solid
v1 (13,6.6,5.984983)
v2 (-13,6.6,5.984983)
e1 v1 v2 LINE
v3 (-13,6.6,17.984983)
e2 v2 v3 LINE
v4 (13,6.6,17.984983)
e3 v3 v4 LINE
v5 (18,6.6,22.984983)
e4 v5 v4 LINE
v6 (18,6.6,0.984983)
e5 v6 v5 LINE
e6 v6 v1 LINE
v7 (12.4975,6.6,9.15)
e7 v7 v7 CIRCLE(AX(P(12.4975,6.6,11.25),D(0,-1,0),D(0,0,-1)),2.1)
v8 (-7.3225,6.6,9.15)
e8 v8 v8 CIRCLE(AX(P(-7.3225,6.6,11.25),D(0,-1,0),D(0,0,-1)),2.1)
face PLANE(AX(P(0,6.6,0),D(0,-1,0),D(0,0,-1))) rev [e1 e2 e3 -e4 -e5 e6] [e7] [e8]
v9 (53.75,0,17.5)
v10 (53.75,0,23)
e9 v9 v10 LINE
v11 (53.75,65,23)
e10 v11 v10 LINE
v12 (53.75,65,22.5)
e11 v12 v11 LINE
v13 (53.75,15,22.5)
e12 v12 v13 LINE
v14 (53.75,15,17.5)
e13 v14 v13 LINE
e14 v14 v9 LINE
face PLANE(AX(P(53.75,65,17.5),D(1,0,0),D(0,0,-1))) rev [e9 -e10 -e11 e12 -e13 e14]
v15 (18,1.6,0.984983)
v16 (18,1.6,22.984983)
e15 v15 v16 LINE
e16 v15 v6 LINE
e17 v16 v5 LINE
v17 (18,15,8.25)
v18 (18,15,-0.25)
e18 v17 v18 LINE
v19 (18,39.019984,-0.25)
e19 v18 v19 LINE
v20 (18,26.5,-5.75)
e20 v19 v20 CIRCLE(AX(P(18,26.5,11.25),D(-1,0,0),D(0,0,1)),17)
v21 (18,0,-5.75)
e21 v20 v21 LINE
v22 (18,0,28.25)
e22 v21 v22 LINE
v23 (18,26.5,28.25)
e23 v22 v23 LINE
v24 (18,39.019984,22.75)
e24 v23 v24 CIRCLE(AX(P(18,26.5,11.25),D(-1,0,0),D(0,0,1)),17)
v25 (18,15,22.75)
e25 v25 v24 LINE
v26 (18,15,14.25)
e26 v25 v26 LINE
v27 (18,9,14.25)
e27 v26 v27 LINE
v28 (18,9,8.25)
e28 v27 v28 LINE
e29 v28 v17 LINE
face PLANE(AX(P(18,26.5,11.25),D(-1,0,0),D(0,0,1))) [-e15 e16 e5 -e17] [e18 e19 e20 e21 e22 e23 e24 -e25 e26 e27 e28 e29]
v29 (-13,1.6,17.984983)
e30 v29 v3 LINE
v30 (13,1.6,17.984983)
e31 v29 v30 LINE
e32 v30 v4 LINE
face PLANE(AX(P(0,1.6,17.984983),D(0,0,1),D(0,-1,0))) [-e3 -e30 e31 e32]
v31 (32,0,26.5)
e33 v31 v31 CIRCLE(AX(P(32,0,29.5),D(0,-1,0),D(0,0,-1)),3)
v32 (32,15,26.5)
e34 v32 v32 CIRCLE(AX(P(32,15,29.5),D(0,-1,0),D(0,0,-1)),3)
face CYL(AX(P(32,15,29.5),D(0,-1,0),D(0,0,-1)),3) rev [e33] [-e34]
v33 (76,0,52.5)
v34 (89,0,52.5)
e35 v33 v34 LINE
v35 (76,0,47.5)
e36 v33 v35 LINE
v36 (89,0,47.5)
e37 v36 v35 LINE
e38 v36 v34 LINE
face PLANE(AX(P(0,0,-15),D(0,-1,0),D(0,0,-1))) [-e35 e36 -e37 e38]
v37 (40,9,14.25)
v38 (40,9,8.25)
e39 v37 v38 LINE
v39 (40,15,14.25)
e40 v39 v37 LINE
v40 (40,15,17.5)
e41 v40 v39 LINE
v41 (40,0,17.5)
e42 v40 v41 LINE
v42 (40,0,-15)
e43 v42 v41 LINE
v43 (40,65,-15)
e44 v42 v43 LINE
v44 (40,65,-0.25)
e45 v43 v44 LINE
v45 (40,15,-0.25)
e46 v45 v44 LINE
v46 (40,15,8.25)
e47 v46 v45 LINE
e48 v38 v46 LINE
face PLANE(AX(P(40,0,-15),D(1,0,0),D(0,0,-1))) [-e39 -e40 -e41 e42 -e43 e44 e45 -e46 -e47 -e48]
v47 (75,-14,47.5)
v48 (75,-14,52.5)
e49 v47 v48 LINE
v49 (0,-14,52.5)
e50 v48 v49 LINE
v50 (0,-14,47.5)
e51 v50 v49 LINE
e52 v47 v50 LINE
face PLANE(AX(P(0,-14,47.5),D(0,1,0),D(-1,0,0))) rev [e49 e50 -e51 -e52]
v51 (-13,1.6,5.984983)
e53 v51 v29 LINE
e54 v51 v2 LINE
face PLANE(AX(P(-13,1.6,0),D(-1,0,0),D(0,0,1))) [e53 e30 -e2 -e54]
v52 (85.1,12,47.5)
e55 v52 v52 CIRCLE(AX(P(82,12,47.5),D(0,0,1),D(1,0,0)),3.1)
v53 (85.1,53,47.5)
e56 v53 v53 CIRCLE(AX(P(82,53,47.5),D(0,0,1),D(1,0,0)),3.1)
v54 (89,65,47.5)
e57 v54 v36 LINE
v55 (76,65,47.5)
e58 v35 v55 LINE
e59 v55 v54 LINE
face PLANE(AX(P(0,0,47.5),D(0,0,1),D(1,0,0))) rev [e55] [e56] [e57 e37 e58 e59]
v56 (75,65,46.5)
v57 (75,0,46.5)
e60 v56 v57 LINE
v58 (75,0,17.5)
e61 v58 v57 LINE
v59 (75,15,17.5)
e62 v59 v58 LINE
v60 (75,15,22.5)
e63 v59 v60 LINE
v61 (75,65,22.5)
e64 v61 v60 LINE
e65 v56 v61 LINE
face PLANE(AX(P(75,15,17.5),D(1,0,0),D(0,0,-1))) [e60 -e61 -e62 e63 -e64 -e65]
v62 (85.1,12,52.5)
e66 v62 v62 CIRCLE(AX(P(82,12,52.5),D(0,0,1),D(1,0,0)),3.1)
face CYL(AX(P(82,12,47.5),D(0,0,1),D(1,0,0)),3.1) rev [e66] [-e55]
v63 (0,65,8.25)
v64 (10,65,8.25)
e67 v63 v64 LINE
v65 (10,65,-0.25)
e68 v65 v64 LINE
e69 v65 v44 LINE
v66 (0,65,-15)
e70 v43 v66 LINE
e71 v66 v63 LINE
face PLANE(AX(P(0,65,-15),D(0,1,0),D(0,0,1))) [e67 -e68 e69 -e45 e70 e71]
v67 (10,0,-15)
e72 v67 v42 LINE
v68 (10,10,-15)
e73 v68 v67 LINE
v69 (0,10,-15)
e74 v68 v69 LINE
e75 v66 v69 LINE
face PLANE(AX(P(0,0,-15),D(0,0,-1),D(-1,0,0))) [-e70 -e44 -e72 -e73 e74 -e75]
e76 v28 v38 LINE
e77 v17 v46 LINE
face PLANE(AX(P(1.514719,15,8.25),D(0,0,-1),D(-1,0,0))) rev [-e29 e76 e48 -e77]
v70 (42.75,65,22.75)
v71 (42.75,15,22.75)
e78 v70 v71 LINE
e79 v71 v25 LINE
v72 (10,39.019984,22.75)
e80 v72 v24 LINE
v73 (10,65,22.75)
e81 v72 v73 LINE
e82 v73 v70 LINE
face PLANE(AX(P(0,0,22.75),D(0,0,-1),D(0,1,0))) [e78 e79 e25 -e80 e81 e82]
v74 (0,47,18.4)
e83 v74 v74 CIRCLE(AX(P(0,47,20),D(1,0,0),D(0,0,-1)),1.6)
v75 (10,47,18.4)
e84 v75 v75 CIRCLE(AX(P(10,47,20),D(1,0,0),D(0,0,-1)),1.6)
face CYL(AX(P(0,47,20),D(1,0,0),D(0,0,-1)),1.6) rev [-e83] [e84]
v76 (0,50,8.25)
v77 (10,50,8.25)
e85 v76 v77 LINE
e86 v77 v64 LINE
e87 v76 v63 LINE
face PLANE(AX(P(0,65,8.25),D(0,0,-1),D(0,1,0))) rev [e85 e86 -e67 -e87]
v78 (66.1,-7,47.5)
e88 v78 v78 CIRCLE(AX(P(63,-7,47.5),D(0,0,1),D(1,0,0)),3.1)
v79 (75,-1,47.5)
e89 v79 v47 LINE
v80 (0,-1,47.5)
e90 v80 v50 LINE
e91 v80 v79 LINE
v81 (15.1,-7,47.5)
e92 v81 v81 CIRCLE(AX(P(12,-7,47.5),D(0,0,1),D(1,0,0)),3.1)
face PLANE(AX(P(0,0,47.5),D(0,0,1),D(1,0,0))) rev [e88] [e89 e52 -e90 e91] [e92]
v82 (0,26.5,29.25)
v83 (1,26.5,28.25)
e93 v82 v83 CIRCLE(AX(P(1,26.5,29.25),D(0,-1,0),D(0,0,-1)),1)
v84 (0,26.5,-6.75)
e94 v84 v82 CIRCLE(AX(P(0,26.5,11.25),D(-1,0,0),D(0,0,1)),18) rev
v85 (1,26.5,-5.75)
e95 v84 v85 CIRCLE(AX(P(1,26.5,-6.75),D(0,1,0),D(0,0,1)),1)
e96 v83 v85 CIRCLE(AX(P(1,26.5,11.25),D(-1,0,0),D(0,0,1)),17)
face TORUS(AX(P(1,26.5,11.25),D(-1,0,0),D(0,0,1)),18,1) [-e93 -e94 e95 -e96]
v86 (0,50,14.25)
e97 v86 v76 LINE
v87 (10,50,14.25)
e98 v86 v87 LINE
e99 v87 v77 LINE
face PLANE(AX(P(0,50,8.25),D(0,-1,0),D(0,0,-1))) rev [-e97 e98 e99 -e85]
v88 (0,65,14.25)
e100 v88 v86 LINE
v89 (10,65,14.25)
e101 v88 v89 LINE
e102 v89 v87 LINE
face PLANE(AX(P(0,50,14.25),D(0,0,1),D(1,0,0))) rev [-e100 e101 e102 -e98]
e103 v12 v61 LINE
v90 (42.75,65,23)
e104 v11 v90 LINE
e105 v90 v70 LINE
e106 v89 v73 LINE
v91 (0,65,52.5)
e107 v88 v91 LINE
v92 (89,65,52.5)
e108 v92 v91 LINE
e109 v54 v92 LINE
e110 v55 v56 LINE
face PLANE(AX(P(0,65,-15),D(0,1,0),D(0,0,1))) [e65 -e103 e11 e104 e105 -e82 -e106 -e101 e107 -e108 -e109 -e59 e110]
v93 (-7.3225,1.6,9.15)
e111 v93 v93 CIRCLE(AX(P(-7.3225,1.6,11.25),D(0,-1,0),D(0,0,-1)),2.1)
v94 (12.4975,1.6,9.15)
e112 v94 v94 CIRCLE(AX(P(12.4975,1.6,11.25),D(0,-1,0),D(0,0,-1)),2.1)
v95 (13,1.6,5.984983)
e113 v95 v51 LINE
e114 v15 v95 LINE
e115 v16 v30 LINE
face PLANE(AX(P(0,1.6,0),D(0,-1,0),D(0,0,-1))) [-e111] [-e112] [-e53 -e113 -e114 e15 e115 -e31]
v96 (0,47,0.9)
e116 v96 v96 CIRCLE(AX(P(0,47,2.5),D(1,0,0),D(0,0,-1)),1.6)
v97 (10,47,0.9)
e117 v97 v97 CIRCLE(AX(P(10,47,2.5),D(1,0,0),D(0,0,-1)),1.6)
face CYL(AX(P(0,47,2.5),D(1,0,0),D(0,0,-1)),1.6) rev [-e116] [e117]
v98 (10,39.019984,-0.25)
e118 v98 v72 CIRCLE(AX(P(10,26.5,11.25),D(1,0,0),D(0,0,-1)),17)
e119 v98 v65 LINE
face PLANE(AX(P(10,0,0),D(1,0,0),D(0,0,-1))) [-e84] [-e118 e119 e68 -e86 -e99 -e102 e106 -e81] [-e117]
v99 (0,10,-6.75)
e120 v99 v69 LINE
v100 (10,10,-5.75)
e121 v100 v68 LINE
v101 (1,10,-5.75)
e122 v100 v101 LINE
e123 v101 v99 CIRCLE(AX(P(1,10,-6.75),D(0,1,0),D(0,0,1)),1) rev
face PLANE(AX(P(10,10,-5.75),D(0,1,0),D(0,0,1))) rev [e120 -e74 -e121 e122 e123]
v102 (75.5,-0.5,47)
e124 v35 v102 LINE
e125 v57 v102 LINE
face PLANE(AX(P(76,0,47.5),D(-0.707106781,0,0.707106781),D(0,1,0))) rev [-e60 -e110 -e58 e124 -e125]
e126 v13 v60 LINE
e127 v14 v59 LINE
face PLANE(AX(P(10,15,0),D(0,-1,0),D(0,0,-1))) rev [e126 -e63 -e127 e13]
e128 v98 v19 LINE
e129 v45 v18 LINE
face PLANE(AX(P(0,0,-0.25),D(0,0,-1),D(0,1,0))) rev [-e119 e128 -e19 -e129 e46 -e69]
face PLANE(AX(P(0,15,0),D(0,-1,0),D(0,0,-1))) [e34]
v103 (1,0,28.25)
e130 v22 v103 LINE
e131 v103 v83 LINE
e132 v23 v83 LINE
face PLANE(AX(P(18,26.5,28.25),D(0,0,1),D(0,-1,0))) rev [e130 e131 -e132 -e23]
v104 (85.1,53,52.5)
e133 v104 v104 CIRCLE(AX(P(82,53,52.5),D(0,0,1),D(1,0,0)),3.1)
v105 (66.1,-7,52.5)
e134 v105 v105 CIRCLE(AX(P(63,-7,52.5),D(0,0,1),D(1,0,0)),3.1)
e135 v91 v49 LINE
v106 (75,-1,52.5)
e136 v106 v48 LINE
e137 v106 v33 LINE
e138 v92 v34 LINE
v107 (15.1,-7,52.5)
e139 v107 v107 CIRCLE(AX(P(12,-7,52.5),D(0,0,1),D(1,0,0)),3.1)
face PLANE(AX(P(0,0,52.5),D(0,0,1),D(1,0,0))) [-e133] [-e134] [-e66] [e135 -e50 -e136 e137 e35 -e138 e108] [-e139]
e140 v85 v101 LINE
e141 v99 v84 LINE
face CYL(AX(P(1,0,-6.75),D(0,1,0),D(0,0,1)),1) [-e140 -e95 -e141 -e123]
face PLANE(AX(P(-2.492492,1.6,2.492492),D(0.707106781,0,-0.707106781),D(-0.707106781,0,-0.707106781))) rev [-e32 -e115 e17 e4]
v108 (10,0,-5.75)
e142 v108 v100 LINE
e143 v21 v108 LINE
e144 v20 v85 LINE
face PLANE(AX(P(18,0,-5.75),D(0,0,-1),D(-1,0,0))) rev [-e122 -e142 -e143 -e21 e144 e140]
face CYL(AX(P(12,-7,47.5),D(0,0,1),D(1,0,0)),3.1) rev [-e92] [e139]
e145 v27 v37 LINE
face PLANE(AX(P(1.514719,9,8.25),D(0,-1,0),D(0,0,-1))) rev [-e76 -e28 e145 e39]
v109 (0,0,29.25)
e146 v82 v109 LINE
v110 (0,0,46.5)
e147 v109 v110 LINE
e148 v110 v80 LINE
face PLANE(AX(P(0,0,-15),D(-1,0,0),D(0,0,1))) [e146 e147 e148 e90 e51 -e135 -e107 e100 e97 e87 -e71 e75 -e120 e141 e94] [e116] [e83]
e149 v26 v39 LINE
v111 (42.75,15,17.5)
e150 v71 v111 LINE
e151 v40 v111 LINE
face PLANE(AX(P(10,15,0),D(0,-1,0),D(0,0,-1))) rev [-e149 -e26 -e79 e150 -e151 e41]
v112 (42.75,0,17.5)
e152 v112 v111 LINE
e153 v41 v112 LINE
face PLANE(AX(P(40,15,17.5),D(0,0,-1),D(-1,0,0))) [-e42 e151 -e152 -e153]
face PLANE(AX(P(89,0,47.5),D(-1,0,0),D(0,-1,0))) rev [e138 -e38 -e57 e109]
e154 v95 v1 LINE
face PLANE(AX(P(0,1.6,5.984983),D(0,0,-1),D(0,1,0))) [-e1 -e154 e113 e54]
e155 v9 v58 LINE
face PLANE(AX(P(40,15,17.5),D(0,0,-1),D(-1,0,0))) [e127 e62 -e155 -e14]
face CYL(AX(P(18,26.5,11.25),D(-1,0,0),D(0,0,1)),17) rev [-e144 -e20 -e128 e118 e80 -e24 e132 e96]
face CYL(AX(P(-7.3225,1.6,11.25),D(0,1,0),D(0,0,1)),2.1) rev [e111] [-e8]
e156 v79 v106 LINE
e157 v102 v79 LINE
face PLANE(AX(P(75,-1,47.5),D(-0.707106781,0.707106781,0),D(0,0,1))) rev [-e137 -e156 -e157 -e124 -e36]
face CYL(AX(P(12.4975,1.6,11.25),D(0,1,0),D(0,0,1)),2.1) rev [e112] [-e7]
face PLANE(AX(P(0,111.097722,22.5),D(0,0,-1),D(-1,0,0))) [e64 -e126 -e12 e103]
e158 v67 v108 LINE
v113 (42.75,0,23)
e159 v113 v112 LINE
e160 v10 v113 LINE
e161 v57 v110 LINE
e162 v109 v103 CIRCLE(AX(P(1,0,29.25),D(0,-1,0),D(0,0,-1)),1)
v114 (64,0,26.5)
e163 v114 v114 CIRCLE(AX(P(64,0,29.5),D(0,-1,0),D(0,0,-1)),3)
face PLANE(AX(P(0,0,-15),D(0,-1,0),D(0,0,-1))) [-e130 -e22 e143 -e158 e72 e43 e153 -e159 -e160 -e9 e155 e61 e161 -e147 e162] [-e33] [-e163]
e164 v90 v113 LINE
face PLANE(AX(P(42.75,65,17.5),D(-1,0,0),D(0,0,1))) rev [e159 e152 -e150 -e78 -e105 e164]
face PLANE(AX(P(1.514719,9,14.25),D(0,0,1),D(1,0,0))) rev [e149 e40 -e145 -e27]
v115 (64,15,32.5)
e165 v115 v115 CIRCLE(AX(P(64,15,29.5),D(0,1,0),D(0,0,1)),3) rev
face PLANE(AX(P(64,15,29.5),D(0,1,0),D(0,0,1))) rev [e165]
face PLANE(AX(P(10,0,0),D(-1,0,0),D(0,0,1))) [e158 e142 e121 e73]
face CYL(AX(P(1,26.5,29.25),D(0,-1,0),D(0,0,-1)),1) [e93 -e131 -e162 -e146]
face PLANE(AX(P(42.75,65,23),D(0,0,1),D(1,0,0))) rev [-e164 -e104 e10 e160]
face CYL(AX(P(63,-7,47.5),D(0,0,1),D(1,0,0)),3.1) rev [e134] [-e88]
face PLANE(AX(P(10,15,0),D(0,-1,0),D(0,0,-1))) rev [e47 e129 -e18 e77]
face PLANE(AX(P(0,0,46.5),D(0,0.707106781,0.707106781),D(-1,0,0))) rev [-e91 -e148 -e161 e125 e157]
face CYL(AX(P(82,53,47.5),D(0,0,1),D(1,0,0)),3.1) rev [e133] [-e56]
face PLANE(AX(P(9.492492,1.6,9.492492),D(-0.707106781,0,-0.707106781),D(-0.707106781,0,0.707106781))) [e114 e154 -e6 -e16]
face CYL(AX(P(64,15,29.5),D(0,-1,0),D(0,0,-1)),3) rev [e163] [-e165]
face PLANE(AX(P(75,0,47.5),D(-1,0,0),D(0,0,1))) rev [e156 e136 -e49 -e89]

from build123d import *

# Parameters (mm, degrees)
BOSS_EXTRUDE1_DEPTH      = 42.5
BOSS_EXTRUDE1_DEPTH_BACK = 15
SKETCH1_W                = 40
SKETCH1_H                = 65
SKETCH3_W                = 22.5
SKETCH3_H                = 50
CUT_EXTRUDE2_DEPTH       = 30
SKETCH4_R                = 4.5
CUT_EXTRUDE3_DEPTH       = 10
SKETCH5_W                = 35
SKETCH5_H                = 25
BOSS_EXTRUDE3_DEPTH      = 15
SKETCH6_R                = 3
CUT_EXTRUDE4_DEPTH       = 15
CUT_EXTRUDE5_DEPTH       = 108.964114408
BOSS_EXTRUDE4_DEPTH      = 10
BOSS_EXTRUDE5_OUTLINE_R  = 3
BOSS_EXTRUDE5_DEPTH      = 50
BOSS_EXTRUDE6_START      = -50
SKETCH11_R               = 3
BOSS_EXTRUDE6_DEPTH      = 50
SKETCH12_W               = 14
SKETCH12_H               = 65
SKETCH12_R               = 3.1
SKETCH12_W_2             = 75
SKETCH12_H_2             = 14
BOSS_EXTRUDE7_DEPTH      = 5
SKETCH13_R               = 1.6
CUT_EXTRUDE6_DEPTH       = 115.988042857
CUT_EXTRUDE7_DEPTH       = 11.5
CUT_EXTRUDE7_DEPTH_BACK  = 11.5
SKETCH14_W               = 43.75
SKETCH14_H               = 50
CUT_EXTRUDE8_DEPTH       = 30
CUT_EXTRUDE9_DEPTH       = 115.988042857
CUT_EXTRUDE10_DEPTH      = 18
SKETCH18_W               = 31
SKETCH18_H               = 12
SKETCH18_R               = 2.1
BOSS_EXTRUDE8_DEPTH      = 5
FILLET2_R                = 1
SKETCH19_W               = 9.25
SKETCH19_H               = 10
CUT_EXTRUDE11_DEPTH      = 10
CHAMFER1_SIZE            = 1
CHAMFER2_SIZE            = 1


# Read off the part's stored shape, not the designer's step: Boss-Extrude5
# Some blends are built 0.0001 mm under size
with BuildPart() as part:
    # Sketch1 → Boss-Extrude1 (new, two sides: drawn at the far end of the back side and taken through both)
    with BuildSketch(Plane.XY.offset(-BOSS_EXTRUDE1_DEPTH_BACK)):
        with Locations((20, 32.5)):
            Rectangle(SKETCH1_W, SKETCH1_H)
    extrude(amount=BOSS_EXTRUDE1_DEPTH + BOSS_EXTRUDE1_DEPTH_BACK)

    # Sketch3 → Cut-Extrude2 (cut)
    with BuildSketch(Plane(origin=(40, 0, 0), x_dir=(0, 0, -1), z_dir=(1, 0, 0))):
        with Locations((-11.25, 40)):
            Rectangle(SKETCH3_W, SKETCH3_H)
    extrude(amount=-CUT_EXTRUDE2_DEPTH, mode=Mode.SUBTRACT)

    # Sketch4 → Cut-Extrude3 (cut)
    with BuildSketch(Plane(origin=(10, 0, 0), x_dir=(0, 0, -1), z_dir=(1, 0, 0))):
        with Locations((-11.25, 26.5)):
            Circle(SKETCH4_R)
    extrude(amount=-CUT_EXTRUDE3_DEPTH, mode=Mode.SUBTRACT)

    # Sketch5 → Boss-Extrude3 (add)
    with BuildSketch(Plane.XZ):
        with Locations((57.5, 30)):
            Rectangle(SKETCH5_W, SKETCH5_H)
    extrude(amount=-BOSS_EXTRUDE3_DEPTH)

    # Sketch6 → Cut-Extrude4 (cut)
    with BuildSketch(Plane.XZ):
        with Locations(Location((32, 29.5, 0), (0, 0, 270))):
            Circle(SKETCH6_R)
        with Locations(Location((64, 29.5, 0), (0, 0, 270))):
            Circle(SKETCH6_R)
    extrude(amount=-CUT_EXTRUDE4_DEPTH, mode=Mode.SUBTRACT)

    # Sketch8 → Cut-Extrude5 (cut, through all)
    with BuildSketch(Plane.XZ):
        Polygon((48.25, 17.5), (42.75, 17.5), (42.75, 23), (53.75, 23), (53.75, 17.5), align=None)
    extrude(amount=-CUT_EXTRUDE5_DEPTH, mode=Mode.SUBTRACT)

    # Sketch9 → Boss-Extrude4 (add)
    with BuildSketch(Plane.XY.offset(42.5)):
        Polygon((0, 65), (0, 0), (75, 0), (75, 15), (40, 15), (40, 65), align=None)
    extrude(amount=BOSS_EXTRUDE4_DEPTH)

    # Boss-Extrude5 outline → Boss-Extrude5 (add)
    with BuildSketch(Plane(origin=(0, 15, 0), x_dir=(1, 0, 0), z_dir=(0, 1, 0))):
        Polygon((75, -52.5), (75, -22.5), (53.75, -22.5), (53.75, -23), (42.75, -23), (42.75, -22.5), (40, -22.5), (40, -52.5), align=None)
        with Locations((64, -29.5)):
            Circle(BOSS_EXTRUDE5_OUTLINE_R, mode=Mode.SUBTRACT)
    extrude(amount=BOSS_EXTRUDE5_DEPTH)

    # Sketch11 → Boss-Extrude6 (add)
    with BuildSketch(Plane(origin=(0, 65, 0), x_dir=(1, 0, 0), z_dir=(0, 1, 0)).offset(BOSS_EXTRUDE6_START)):
        with Locations(Location((64, -29.5, 0), (0, 0, 90))):
            Circle(SKETCH11_R)
    extrude(amount=BOSS_EXTRUDE6_DEPTH)

    # Sketch12 → Boss-Extrude7 (add)
    # profile 1 of 2: a face of its own
    with BuildSketch(Plane.XY.offset(52.5)):
        with Locations((82, 32.5)):
            Rectangle(SKETCH12_W, SKETCH12_H)
        with Locations((82, 53)):
            Circle(SKETCH12_R, mode=Mode.SUBTRACT)
        with Locations((82, 12)):
            Circle(SKETCH12_R, mode=Mode.SUBTRACT)
    # profile 2 of 2: a face of its own
    with BuildSketch(Plane.XY.offset(52.5)):
        with Locations((37.5, -7)):
            Rectangle(SKETCH12_W_2, SKETCH12_H_2)
        with Locations((12, -7)):
            Circle(SKETCH12_R, mode=Mode.SUBTRACT)
        with Locations((63, -7)):
            Circle(SKETCH12_R, mode=Mode.SUBTRACT)
    extrude(amount=-BOSS_EXTRUDE7_DEPTH)

    # Sketch13 → Cut-Extrude6 (cut, through all)
    with BuildSketch(Plane(origin=(10, 0, 0), x_dir=(0, 0, -1), z_dir=(1, 0, 0))):
        with Locations((-2.5, 47)):
            Circle(SKETCH13_R)
        with Locations((-20, 47)):
            Circle(SKETCH13_R)
    extrude(amount=-CUT_EXTRUDE6_DEPTH, mode=Mode.SUBTRACT)

    # Sketch14 → Cut-Extrude7 (cut, two sides: drawn at the far end of the back side and taken through both)
    with BuildSketch(Plane(origin=(0, 0, 11.25), x_dir=(-1, 0, 0), z_dir=(0, 0, -1)).offset(-CUT_EXTRUDE7_DEPTH_BACK)):
        with Locations((-31.875, 40)):
            Rectangle(SKETCH14_W, SKETCH14_H)
    extrude(amount=CUT_EXTRUDE7_DEPTH + CUT_EXTRUDE7_DEPTH_BACK, mode=Mode.SUBTRACT)

    # Sketch15 → Cut-Extrude8 (cut)
    with BuildSketch(Plane(origin=(40, 0, 0), x_dir=(0, 0, -1), z_dir=(1, 0, 0))):
        Polygon((-11.25, 15), (-8.25, 15), (-8.25, 9), (-14.25, 9), (-14.25, 15), align=None)
    extrude(amount=-CUT_EXTRUDE8_DEPTH, mode=Mode.SUBTRACT)

    # Sketch16 → Cut-Extrude9 (cut, through all)
    with BuildSketch(Plane(origin=(10, 0, 0), x_dir=(0, 0, -1), z_dir=(1, 0, 0))):
        Polygon((-11.25, 65), (-8.25, 65), (-8.25, 50), (-14.25, 50), (-14.25, 65), align=None)
    extrude(amount=-CUT_EXTRUDE9_DEPTH, mode=Mode.SUBTRACT)

    # Sketch17 → Cut-Extrude10 (cut)
    with BuildSketch(Plane.ZY):
        with BuildLine():
            Line((28.25, 26.5), (28.25, 0))
            Line((28.25, 0), (-5.75, 0))
            Line((-5.75, 0), (-5.75, 26.5))
            ThreePointArc((-5.75, 26.5), (11.25, 43.5), (28.25, 26.5))
        make_face()
    extrude(amount=-CUT_EXTRUDE10_DEPTH, mode=Mode.SUBTRACT)

    # Sketch18 → Boss-Extrude8 (add)
    # profile 1 of 3: a face of its own
    with BuildSketch(Plane(origin=(78.326188017, 6.6, -27.619079409), x_dir=(-1, 0, 0), z_dir=(0, -1, 0))):
        Polygon((60.326188017, -28.604062705), (60.326188017, -33.604062705), (65.326188017, -33.604062705), align=None)
    # profile 2 of 3: a face of its own
    with BuildSketch(Plane(origin=(78.326188017, 6.6, -27.619079409), x_dir=(-1, 0, 0), z_dir=(0, -1, 0))):
        Polygon((65.326188017, -45.604062705), (60.326188017, -45.604062705), (60.326188017, -50.604062705), align=None)
    # profile 3 of 3: a face of its own
    with BuildSketch(Plane(origin=(78.326188017, 6.6, -27.619079409), x_dir=(-1, 0, 0), z_dir=(0, -1, 0))):
        with Locations((75.826188017, -39.604062705)):
            Rectangle(SKETCH18_W, SKETCH18_H)
        with Locations(Location((85.648688017, -38.869079409, 0), (0, 0, 90))):
            Circle(SKETCH18_R, mode=Mode.SUBTRACT)
        with Locations(Location((65.828688017, -38.869079409, 0), (0, 0, 90))):
            Circle(SKETCH18_R, mode=Mode.SUBTRACT)
    extrude(amount=BOSS_EXTRUDE8_DEPTH)

    # Fillet2
    fillet2_edges = [part.edges().sort_by_distance(p)[0] for p in [
        (0, 43.5, 11.25),
        (0, 13.25, -5.75),
        (0, 13.25, 28.25),
    ]]
    fillet(fillet2_edges, radius=FILLET2_R)

    # Sketch19 → Cut-Extrude11 (cut)
    with BuildSketch(Plane.ZY):
        with Locations((-10.375, 5)):
            Rectangle(SKETCH19_W, SKETCH19_H)
    extrude(amount=-CUT_EXTRUDE11_DEPTH, mode=Mode.SUBTRACT)

    # Chamfer1
    # the kernel refuses this chamfer: 1 mm, written as the material it adds along each edge
    with BuildSketch(Plane(origin=(75, 0, 47.5), x_dir=(-0.027495876610582105, 0, -0.999621916911297), z_dir=(0, 1, 0))) as chamfer1_piece_1:
        Polygon((CHAMFER1_SIZE * 0.999621916911, -CHAMFER1_SIZE * 0.0274958766106), (-CHAMFER1_SIZE * 0.0274958766106, -CHAMFER1_SIZE * 0.999621916911), (0, 0), align=None)
    extrude(amount=65)

    # Chamfer2
    chamfer2_edges = [part.edges().sort_by_distance(p)[0] for p in [
        (37.5, 0, 47.5),
    ]]
    chamfer(chamfer2_edges, length=CHAMFER2_SIZE - 0.0001)  # a hair under: the kernel refuses the full size

    # Chamfer3
    # the kernel refuses this chamfer: 1 mm, written as the material it adds along each edge
    with BuildSketch(Plane(origin=(75, 0, 52.5), x_dir=(0.9996219169112968, 0.02749587661058591, 0), z_dir=(0, 0, -1))) as chamfer3_piece_1_section:
        with BuildLine():
            Line((1.028673195, 0), (-0.056547155, 1.027117794))
            Line((-0.056547155, 1.027117794), (-0.076539593, 1.026567876))
            ThreePointArc((-0.076539593, 1.026567876), (-0.034129227, 0.51339783), (-0.019992438, -0.000549918))
            Line((-0.019992438, -0.000549918), (0.000549918, -0.019992438))
            ThreePointArc((0.000549918, -0.019992438), (0.514497665, -0.00585565), (1.029223113, -0.019992438))
            Line((1.029223113, -0.019992438), (1.028673195, 0))
        make_face()
    chamfer3_piece_1 = extrude(amount=8.571582988, mode=Mode.PRIVATE)
    chamfer3_piece_1 = split(chamfer3_piece_1, bisect_by=Plane(origin=(75.329792283, -0.329792248, 47.5), z_dir=(0, 0, 1)), keep=Keep.TOP, mode=Mode.PRIVATE)
    add(chamfer3_piece_1)
    with BuildSketch(Plane(origin=(75, 0, 52.5), x_dir=(0.9996219169112968, 0.02749587661058591, 0), z_dir=(0, 0, -1))) as chamfer3_piece_2_section:
        with BuildLine():
            Line((1.028673195, 0), (-0.056547155, 1.027117794))
            Line((-0.056547155, 1.027117794), (-0.076539593, 1.026567876))
            ThreePointArc((-0.076539593, 1.026567876), (-0.034129227, 0.51339783), (-0.019992438, -0.000549918))
            Line((-0.019992438, -0.000549918), (0.000549918, -0.019992438))
            ThreePointArc((0.000549918, -0.019992438), (0.514497665, -0.00585565), (1.029223113, -0.019992438))
            Line((1.029223113, -0.019992438), (1.028673195, 0))
        make_face()
    chamfer3_piece_2 = extrude(amount=8.571582988, mode=Mode.PRIVATE)
    chamfer3_piece_2 = split(chamfer3_piece_2, bisect_by=Plane(origin=(74.967608751, -1.017389606, 47.5), z_dir=(0, 0, 1)), keep=Keep.TOP, mode=Mode.PRIVATE)
    chamfer3_piece_2 = split(chamfer3_piece_2, bisect_by=Plane(origin=(74.967608751, -1.013017205, 47.513117205), z_dir=(0, -0.7071067811865464, -0.7071067811865488)), keep=Keep.TOP, mode=Mode.PRIVATE)
    add(chamfer3_piece_2)
    with BuildSketch(Plane(origin=(75, 0, 52.5), x_dir=(0.9996219169112968, 0.02749587661058591, 0), z_dir=(0, 0, -1))) as chamfer3_piece_3_section:
        with BuildLine():
            Line((1.028673195, 0), (-0.056547155, 1.027117794))
            Line((-0.056547155, 1.027117794), (-0.076539593, 1.026567876))
            ThreePointArc((-0.076539593, 1.026567876), (-0.034129227, 0.51339783), (-0.019992438, -0.000549918))
            Line((-0.019992438, -0.000549918), (0.000549918, -0.019992438))
            ThreePointArc((0.000549918, -0.019992438), (0.514497665, -0.00585565), (1.029223113, -0.019992438))
            Line((1.029223113, -0.019992438), (1.028673195, 0))
        make_face()
    chamfer3_piece_3 = extrude(amount=8.571582988, mode=Mode.PRIVATE)
    chamfer3_piece_3 = split(chamfer3_piece_3, bisect_by=Plane(origin=(75.495112372, -0.283467256, 46.995112372), z_dir=(-0.7071067811862649, 0, 0.7071067811868302)), keep=Keep.TOP, mode=Mode.PRIVATE)
    chamfer3_piece_3 = split(chamfer3_piece_3, bisect_by=Plane(origin=(75.283503511, -0.283467256, 47.5), z_dir=(0, 0, -1)), keep=Keep.TOP, mode=Mode.PRIVATE)
    chamfer3_piece_3 = split(chamfer3_piece_3, bisect_by=Plane(origin=(75.283503511, -0.495044244, 46.995144244), z_dir=(0, 0.7071067811865464, 0.7071067811865488)), keep=Keep.TOP, mode=Mode.PRIVATE)
    add(chamfer3_piece_3)
    with BuildSketch(Plane(origin=(75, 0, 52.5), x_dir=(0.9996219169112968, 0.02749587661058591, 0), z_dir=(0, 0, -1))) as chamfer3_piece_4_section:
        with BuildLine():
            Line((1.028673195, 0), (-0.056547155, 1.027117794))
            Line((-0.056547155, 1.027117794), (-0.076539593, 1.026567876))
            ThreePointArc((-0.076539593, 1.026567876), (-0.034129227, 0.51339783), (-0.019992438, -0.000549918))
            Line((-0.019992438, -0.000549918), (0.000549918, -0.019992438))
            ThreePointArc((0.000549918, -0.019992438), (0.514497665, -0.00585565), (1.029223113, -0.019992438))
            Line((1.029223113, -0.019992438), (1.028673195, 0))
        make_face()
    chamfer3_piece_4 = extrude(amount=8.571582988, mode=Mode.PRIVATE)
    chamfer3_piece_4 = split(chamfer3_piece_4, bisect_by=Plane(origin=(76.01307363, 0.032413897, 47.51307363), z_dir=(0.7071067811862649, 0, -0.7071067811868302)), keep=Keep.TOP, mode=Mode.PRIVATE)
    chamfer3_piece_4 = split(chamfer3_piece_4, bisect_by=Plane(origin=(76.017431506, 0.032413897, 47.5), z_dir=(0, 0, 1)), keep=Keep.TOP, mode=Mode.PRIVATE)
    add(chamfer3_piece_4)


solid = part.part
